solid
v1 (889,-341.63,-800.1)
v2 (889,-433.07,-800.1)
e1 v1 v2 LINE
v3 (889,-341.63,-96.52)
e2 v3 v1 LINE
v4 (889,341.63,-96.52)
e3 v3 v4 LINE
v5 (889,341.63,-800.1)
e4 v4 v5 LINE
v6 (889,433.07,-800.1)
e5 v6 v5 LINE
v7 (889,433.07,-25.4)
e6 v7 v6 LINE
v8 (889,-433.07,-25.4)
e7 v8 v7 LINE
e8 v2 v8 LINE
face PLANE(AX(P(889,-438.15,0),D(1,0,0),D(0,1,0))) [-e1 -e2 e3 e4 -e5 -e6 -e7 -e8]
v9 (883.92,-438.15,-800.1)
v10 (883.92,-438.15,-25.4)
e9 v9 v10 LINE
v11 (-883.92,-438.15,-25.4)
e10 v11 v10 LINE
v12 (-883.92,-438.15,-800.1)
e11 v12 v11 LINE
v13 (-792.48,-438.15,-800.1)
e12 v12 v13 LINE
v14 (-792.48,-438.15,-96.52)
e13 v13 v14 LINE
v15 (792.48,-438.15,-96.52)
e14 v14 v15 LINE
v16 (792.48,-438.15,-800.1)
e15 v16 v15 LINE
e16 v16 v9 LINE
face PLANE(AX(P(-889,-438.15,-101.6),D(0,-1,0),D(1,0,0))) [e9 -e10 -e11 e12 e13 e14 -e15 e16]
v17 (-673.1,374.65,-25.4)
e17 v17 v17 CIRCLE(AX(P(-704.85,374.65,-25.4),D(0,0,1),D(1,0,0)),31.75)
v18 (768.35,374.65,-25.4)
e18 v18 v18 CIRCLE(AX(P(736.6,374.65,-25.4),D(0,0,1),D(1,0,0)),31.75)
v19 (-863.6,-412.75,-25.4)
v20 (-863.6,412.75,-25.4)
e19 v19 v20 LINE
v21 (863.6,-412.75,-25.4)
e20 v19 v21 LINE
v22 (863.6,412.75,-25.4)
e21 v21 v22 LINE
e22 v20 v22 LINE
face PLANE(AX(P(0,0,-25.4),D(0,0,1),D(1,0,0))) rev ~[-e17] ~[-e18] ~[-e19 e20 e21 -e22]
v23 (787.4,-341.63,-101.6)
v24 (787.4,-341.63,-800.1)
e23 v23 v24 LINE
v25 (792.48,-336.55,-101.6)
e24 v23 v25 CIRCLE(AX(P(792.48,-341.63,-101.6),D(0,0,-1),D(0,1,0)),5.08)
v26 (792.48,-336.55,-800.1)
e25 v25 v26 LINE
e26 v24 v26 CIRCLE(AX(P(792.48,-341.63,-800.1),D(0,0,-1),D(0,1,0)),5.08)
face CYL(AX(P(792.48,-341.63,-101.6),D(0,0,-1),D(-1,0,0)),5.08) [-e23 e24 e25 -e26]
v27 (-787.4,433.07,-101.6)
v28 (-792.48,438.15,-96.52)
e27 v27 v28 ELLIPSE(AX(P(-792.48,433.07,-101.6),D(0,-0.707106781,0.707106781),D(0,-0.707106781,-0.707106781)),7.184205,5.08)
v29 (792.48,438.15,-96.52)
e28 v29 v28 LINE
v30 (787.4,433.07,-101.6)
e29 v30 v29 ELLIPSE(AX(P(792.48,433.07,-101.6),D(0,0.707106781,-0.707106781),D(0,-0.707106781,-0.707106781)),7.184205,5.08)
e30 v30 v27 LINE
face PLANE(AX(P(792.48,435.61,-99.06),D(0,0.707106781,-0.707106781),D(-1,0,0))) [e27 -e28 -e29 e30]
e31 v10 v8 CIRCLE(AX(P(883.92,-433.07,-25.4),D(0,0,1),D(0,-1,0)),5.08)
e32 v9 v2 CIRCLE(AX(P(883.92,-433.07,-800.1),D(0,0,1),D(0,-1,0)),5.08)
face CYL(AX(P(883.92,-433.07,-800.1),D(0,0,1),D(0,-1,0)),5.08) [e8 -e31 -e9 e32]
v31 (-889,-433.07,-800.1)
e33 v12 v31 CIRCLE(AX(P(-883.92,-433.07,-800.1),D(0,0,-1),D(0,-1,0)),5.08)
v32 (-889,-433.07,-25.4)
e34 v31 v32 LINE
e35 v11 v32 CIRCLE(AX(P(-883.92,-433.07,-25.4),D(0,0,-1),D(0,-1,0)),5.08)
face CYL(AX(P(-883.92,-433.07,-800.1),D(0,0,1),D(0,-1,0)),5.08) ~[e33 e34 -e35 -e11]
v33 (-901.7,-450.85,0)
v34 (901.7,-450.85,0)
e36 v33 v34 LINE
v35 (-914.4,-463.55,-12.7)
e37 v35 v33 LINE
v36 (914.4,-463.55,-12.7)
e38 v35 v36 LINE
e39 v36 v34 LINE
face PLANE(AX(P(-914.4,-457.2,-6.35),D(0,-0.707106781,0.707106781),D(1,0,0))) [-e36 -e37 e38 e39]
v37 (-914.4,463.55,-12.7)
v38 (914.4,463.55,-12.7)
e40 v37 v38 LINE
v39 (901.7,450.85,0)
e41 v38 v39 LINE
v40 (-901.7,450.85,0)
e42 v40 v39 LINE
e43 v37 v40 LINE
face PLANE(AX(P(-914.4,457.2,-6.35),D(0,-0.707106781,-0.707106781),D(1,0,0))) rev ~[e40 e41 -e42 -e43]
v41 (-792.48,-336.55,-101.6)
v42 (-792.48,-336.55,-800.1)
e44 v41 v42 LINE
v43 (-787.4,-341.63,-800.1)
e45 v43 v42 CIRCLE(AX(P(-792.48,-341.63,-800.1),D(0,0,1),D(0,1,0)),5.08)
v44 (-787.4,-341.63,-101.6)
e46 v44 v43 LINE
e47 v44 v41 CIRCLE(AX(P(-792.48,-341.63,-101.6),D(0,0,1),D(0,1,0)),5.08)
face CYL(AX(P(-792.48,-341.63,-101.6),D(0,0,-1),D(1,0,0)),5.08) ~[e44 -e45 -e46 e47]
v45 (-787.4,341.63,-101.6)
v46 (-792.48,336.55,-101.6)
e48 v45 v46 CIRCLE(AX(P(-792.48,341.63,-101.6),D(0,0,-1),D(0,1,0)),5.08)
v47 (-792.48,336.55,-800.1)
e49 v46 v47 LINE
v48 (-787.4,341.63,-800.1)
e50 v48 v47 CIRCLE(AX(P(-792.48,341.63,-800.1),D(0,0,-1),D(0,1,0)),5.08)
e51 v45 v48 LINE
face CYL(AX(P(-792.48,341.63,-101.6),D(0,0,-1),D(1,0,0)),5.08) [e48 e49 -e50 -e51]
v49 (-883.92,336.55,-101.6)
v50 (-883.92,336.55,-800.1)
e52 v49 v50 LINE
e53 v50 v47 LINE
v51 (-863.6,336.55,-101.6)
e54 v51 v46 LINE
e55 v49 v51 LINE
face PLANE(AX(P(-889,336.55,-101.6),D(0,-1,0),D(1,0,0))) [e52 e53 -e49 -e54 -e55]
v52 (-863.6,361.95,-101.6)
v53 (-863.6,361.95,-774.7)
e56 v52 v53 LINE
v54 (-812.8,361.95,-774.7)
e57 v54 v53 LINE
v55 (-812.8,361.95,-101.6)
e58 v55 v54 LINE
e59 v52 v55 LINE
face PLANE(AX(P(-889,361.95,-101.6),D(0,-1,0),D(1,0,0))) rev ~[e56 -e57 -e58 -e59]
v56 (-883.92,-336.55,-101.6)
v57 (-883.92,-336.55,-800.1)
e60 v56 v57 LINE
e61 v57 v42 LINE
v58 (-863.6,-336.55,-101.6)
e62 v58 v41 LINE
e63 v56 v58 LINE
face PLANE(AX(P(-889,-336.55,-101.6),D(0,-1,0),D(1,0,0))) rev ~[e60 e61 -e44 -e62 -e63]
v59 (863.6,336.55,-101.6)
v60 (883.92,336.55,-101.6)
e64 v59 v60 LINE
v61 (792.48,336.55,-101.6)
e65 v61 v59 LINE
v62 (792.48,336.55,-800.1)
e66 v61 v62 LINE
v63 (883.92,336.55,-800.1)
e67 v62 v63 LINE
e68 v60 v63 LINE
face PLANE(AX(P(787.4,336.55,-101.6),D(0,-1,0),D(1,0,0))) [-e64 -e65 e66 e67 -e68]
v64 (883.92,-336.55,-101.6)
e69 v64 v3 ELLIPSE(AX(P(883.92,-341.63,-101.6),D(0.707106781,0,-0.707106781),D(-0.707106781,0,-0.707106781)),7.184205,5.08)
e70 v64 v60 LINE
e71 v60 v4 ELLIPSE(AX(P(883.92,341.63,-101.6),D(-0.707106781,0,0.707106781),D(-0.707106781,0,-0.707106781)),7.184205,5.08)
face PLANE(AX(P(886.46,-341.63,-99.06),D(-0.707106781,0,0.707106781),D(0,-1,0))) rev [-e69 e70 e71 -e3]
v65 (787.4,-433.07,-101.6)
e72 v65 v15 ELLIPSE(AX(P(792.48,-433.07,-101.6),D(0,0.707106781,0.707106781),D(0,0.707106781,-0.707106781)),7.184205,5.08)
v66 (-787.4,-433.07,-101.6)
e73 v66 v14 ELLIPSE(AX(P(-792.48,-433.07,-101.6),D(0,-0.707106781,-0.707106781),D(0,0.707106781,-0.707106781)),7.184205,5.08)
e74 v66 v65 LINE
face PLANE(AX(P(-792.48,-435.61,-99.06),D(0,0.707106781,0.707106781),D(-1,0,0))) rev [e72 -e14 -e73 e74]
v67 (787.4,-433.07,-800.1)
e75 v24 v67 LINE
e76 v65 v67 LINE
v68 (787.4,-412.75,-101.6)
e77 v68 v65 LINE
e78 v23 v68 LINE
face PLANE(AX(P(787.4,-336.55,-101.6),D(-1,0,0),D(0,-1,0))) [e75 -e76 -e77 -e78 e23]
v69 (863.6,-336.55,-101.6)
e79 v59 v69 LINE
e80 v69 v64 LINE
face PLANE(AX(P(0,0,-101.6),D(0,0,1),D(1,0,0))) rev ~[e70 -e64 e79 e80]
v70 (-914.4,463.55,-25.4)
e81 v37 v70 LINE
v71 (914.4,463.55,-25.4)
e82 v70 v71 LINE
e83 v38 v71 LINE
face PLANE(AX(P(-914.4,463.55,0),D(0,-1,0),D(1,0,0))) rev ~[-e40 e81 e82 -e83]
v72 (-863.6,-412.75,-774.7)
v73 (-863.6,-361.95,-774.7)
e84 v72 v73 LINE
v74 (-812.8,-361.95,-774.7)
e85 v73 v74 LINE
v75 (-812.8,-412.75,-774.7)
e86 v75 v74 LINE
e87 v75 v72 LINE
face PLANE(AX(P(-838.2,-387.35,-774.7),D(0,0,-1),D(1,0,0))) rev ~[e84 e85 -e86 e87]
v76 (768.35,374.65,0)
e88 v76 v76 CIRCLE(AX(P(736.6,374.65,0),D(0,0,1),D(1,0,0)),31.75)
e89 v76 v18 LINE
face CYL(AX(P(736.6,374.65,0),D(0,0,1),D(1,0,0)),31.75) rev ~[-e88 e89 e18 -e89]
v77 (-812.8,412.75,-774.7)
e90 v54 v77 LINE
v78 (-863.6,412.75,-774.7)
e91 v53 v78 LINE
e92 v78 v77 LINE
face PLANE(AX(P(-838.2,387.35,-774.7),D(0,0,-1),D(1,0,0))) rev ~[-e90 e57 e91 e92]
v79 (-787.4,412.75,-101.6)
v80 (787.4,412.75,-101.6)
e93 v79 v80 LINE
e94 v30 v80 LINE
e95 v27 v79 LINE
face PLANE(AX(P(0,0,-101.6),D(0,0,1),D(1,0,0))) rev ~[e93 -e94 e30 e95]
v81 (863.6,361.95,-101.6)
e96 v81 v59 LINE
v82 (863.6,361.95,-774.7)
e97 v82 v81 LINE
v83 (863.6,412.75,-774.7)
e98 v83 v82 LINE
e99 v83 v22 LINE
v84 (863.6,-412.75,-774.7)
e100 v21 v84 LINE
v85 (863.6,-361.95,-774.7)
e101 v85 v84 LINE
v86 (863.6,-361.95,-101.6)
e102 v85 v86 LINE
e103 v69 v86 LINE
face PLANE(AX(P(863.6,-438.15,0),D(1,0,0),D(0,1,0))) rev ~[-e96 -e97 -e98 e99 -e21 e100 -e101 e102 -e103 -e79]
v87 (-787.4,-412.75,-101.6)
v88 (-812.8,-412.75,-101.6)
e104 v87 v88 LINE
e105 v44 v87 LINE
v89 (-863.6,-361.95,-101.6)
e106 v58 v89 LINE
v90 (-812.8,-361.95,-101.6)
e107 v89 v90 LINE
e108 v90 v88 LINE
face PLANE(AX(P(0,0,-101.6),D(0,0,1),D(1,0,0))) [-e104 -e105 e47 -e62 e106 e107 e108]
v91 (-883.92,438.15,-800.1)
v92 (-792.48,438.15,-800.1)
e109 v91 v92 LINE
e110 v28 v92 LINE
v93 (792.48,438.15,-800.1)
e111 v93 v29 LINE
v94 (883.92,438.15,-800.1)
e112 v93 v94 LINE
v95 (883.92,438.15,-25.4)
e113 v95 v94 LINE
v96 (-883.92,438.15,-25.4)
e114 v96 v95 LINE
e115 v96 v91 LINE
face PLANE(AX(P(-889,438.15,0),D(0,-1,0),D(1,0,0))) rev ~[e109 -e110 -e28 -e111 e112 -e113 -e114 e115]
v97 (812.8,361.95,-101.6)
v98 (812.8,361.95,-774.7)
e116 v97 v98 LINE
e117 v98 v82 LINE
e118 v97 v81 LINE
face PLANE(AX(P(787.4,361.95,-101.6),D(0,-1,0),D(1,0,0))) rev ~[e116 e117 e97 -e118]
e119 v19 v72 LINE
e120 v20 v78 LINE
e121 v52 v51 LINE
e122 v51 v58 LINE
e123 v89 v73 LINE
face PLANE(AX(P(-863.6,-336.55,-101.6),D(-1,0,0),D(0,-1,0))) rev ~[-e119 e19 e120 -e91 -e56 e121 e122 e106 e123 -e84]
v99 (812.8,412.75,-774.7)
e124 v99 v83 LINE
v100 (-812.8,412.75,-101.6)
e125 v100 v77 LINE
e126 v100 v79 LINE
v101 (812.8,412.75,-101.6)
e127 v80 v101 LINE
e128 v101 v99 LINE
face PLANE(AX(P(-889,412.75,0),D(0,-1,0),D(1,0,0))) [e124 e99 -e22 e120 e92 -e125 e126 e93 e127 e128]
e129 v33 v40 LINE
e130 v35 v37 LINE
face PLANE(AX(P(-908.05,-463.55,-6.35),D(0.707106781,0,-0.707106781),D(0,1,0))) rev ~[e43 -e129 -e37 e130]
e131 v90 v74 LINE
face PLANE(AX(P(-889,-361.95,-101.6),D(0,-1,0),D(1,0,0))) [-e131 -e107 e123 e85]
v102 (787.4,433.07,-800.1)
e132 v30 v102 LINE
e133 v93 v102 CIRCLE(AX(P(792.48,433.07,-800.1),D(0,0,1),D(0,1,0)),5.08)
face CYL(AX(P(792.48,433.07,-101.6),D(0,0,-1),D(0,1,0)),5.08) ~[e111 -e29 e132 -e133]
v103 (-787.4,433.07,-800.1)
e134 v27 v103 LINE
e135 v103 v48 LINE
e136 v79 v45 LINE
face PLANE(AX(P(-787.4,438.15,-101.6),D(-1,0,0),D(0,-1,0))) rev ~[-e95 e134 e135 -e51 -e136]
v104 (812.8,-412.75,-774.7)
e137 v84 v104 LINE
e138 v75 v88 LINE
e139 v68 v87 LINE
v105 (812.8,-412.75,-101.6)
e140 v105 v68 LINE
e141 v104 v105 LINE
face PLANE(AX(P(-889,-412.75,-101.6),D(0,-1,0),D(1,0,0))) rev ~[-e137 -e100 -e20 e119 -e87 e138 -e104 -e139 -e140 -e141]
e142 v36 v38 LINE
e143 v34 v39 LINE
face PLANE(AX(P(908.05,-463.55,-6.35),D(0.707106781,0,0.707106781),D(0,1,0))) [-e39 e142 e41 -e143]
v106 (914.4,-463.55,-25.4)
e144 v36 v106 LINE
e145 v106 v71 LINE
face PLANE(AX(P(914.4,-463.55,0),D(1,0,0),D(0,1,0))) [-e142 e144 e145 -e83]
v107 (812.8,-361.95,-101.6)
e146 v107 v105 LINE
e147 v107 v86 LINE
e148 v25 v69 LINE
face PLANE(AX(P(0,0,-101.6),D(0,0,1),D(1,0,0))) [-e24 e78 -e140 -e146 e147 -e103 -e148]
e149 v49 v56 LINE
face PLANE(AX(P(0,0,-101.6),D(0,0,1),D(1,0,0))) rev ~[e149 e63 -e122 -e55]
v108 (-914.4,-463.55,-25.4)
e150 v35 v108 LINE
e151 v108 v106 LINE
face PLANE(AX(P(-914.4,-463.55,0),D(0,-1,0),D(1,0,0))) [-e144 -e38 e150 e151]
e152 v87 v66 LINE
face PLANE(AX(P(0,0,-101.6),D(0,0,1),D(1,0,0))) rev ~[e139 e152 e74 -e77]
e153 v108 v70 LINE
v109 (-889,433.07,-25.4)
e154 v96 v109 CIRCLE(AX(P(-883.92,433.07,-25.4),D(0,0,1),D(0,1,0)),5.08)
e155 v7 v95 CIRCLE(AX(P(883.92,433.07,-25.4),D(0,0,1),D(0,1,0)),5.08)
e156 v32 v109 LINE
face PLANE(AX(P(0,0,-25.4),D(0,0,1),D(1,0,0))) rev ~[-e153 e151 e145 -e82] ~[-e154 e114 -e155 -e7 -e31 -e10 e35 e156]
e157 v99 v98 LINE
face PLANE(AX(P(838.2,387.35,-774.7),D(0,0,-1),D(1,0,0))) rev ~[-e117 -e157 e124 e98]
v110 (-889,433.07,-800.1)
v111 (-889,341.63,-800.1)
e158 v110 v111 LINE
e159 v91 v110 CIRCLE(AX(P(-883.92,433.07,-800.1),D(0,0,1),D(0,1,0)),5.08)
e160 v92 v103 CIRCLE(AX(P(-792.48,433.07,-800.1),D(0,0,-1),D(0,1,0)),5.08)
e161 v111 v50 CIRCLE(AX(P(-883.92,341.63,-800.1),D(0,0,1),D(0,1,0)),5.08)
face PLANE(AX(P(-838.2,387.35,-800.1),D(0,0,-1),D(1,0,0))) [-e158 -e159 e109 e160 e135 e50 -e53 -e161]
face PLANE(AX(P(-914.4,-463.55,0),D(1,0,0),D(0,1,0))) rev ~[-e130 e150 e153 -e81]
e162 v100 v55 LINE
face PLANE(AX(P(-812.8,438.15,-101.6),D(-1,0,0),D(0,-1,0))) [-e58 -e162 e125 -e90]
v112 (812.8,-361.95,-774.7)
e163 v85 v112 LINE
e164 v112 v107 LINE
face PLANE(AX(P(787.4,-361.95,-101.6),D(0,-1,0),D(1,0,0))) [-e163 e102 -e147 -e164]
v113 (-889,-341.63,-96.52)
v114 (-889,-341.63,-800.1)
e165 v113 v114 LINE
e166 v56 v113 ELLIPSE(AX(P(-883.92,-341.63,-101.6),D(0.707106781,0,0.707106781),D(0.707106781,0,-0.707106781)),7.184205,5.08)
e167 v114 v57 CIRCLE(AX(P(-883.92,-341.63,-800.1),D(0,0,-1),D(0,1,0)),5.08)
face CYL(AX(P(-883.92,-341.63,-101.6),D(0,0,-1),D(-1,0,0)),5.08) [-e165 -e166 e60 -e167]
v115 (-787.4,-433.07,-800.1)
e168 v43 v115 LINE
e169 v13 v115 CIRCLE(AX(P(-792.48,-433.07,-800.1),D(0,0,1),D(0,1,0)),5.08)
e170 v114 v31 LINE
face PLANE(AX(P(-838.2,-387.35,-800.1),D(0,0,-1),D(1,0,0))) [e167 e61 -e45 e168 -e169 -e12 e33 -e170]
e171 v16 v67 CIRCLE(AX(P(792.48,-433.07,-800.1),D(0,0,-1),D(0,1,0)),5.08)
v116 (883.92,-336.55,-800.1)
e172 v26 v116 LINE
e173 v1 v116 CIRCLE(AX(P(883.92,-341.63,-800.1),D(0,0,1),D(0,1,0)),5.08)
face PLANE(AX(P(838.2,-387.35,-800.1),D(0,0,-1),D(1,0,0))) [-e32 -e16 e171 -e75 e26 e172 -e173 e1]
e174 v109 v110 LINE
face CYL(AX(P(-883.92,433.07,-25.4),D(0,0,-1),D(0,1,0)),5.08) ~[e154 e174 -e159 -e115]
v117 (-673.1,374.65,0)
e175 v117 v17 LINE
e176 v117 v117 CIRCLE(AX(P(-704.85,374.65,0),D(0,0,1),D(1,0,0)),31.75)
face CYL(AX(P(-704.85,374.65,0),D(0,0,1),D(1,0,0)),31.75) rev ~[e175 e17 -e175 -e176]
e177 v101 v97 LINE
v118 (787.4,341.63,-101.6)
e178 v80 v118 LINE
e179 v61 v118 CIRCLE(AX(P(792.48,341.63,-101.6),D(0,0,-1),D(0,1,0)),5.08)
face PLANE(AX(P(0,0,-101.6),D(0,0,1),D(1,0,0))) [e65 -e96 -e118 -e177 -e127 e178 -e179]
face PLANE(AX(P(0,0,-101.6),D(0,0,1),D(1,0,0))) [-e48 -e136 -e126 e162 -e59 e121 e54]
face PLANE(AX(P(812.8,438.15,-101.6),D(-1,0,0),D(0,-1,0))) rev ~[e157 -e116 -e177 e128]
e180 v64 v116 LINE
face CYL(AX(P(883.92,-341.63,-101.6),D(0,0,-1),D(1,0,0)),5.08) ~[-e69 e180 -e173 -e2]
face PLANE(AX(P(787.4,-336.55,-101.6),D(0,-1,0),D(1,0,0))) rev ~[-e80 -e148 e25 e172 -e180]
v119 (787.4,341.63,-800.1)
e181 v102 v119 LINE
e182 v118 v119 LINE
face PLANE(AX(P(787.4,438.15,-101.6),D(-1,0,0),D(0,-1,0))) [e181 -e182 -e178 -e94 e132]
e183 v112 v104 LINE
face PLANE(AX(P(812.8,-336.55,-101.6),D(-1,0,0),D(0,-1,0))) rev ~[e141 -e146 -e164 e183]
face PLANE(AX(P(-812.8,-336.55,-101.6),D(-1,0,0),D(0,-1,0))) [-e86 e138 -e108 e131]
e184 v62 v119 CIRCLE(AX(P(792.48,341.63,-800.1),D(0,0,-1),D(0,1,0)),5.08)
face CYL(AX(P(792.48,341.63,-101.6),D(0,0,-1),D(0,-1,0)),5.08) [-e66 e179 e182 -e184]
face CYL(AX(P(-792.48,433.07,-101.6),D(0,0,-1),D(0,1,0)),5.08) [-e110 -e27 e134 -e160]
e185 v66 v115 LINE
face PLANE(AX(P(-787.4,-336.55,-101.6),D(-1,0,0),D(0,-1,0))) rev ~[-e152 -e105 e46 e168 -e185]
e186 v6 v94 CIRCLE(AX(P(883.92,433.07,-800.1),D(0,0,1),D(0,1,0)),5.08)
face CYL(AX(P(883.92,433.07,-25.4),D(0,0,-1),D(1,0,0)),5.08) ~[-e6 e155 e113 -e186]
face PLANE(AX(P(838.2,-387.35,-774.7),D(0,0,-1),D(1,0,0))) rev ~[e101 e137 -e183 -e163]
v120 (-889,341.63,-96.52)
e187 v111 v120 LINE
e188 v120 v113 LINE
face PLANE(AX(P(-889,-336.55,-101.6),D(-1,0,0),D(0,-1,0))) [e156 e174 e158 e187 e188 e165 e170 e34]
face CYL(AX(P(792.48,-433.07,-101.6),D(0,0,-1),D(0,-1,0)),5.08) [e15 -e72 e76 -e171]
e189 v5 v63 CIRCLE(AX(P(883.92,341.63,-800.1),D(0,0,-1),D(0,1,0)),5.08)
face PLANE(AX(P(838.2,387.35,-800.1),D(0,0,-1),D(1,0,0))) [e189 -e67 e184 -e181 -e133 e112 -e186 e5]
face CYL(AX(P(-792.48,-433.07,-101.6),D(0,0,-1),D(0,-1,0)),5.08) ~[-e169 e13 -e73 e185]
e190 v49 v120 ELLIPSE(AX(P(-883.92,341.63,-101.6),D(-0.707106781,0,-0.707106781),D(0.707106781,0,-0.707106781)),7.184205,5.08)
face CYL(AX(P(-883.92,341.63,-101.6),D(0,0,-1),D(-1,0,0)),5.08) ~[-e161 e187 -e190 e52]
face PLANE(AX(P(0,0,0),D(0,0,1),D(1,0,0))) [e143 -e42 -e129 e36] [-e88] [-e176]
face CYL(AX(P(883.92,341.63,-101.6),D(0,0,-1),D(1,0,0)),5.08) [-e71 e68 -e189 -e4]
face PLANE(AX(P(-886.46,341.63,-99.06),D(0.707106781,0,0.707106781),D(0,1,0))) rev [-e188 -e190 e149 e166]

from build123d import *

# Parameters (mm, degrees)
F1_W        = 1828.8
F1_H        = 927.1
F2_DEPTH    = 25.4
F0_W        = 1778
F0_H        = 876.3
F3_DEPTH    = 101.6
F4_W        = 101.6
F4_H        = 101.6
F5_DEPTH    = 698.5
F6_T        = 25.4
F6_T3_DEPTH = 927.1
F6_T5_DEPTH = 1828.8
F7_R        = 31.75
F8_DEPTH    = 25.4
F9_SIZE     = 12.7
F10_R       = 5.08
F11_SIZE    = 5.08


# Not quite as in the source:
# - a shell that OpenCascade refuses in one call is made with other operations: the cavity is built on its own and cut out


with BuildPart() as f2:
    # F1 (on Top) → F2 (new body)
    with BuildSketch(Plane.XY):
        Rectangle(F1_W, F1_H)
    extrude(amount=-F2_DEPTH)

    # F0 (on Top) → F3 (join)
    with BuildSketch(Plane.XY):
        Rectangle(F0_W, F0_H)
    extrude(amount=-F3_DEPTH)

    # F4 (on face) → F5 (join)
    with BuildSketch(Plane(origin=(0, 0, -101.6), x_dir=(1, 0, 0), z_dir=(0, 0, -1))):
        with Locations((-838.2, 387.35)):
            Rectangle(F4_W, F4_H)
        with Locations((-838.2, -387.35)):
            Rectangle(F4_W, F4_H)
        with Locations((838.2, 387.35)):
            Rectangle(F4_W, F4_H)
        with Locations((838.2, -387.35)):
            Rectangle(F4_W, F4_H)
    extrude(amount=F5_DEPTH)

    # F6: shell of thickness 25.4, made by hand


with BuildPart() as f6_core1:
    # F6_t2: copy of F2
    add(f2.part)

    # the walls: a layer under each face that stays
    f6_faces = [f6_core1.faces().sort_by_distance(p)[0] for p in [
        (0, 463.55, -12.7),
        (628.65, -452.1043209877, -25.4),
        (762, 438.15, -80.7357142857),
        (-838.2, 387.35, -800.1),
        (-838.2, 336.55, -450.85),
        (-787.4, 387.35, -450.85),
        (-838.2, -336.55, -450.85),
        (-838.2, -387.35, -800.1),
        (-787.4, -387.35, -450.85),
        (787.4, -387.35, -450.85),
        (838.2, -387.35, -800.1),
        (838.2, -336.55, -450.85),
        (838.2, 336.55, -450.85),
        (787.4, 387.35, -450.85),
        (838.2, 387.35, -800.1),
        (889, -375.5571428571, -744.7642857143),
        (-762, -438.15, -80.7357142857),
        (-889, 375.5571428571, -744.7642857143),
        (0, -463.55, -12.7),
        (0, 0, 0),
        (-914.4, 0, -12.7),
        (914.4, 0, -12.7),
    ]]
    thicken(f6_faces, amount=-F6_T, mode=Mode.SUBTRACT)

    # F6_s4 → F6_t3 (cut)
    with BuildSketch(Plane.XZ.offset(-463.55)):
        Polygon((-889.254, -25.654), (-889, 0), (-863.6, 0), (-863.6, -25.4), align=None)
        Polygon((889.254, -25.654), (889, 0), (863.6, 0), (863.6, -25.4), align=None)
    extrude(amount=F6_T3_DEPTH, mode=Mode.SUBTRACT)

    # F6_s6 → F6_t5 (cut)
    with BuildSketch(Plane.YZ.offset(-914.4)):
        Polygon((-438.404, -25.654), (-438.15, 0), (-412.75, 0), (-412.75, -25.4), align=None)
        Polygon((438.404, -25.654), (438.15, 0), (412.75, 0), (412.75, -25.4), align=None)
    extrude(amount=F6_T5_DEPTH, mode=Mode.SUBTRACT)


with BuildPart() as f2_1:
    add(f2.part)

    # what is left inside the walls is the cavity
    f6_cavity = [f6_core1.part.solids().sort_by_distance(p)[0] for p in [
        (0, -137.583333, -25.654),
    ]]
    add(f6_cavity, mode=Mode.SUBTRACT)

    # F7 (on face) → F8 (cut)
    with BuildSketch(Plane.XY):
        with Locations((-704.85, 374.65)):
            Circle(F7_R)
        with Locations((736.6, 374.65)):
            Circle(F7_R)
    extrude(amount=-F8_DEPTH, mode=Mode.SUBTRACT)

    # F9
    f9_edges = [f2_1.edges().sort_by_distance(p)[0] for p in [
        (0, -463.55, 0),
        (-914.4, 0, 0),
        (0, 463.55, 0),
        (914.4, 0, 0),
    ]]
    chamfer(f9_edges, length=F9_SIZE)

    # F10
    f10_edges = [f2_1.edges().sort_by_distance(p)[0] for p in [
        (-889, -438.15, -412.75),
        (-787.4, -438.15, -450.85),
        (-889, -336.55, -450.85),
        (-787.4, -336.55, -450.85),
        (787.4, -438.15, -450.85),
        (889, -438.15, -412.75),
        (787.4, -336.55, -450.85),
        (889, -336.55, -450.85),
        (889, 336.55, -450.85),
        (787.4, 336.55, -450.85),
        (889, 438.15, -412.75),
        (787.4, 438.15, -450.85),
        (-889, 438.15, -412.75),
        (-787.4, 438.15, -450.85),
        (-889, 336.55, -450.85),
        (-787.4, 336.55, -450.85),
    ]]
    fillet(f10_edges, radius=F10_R)

    # F11
    f11_edges = [f2_1.edges().sort_by_distance(p)[0] for p in [
        (-889, 0, -101.6),
        (0, -438.15, -101.6),
        (889, 0, -101.6),
        (0, 438.15, -101.6),
    ]]
    chamfer(f11_edges, length=F11_SIZE)


solid = f2_1.part
